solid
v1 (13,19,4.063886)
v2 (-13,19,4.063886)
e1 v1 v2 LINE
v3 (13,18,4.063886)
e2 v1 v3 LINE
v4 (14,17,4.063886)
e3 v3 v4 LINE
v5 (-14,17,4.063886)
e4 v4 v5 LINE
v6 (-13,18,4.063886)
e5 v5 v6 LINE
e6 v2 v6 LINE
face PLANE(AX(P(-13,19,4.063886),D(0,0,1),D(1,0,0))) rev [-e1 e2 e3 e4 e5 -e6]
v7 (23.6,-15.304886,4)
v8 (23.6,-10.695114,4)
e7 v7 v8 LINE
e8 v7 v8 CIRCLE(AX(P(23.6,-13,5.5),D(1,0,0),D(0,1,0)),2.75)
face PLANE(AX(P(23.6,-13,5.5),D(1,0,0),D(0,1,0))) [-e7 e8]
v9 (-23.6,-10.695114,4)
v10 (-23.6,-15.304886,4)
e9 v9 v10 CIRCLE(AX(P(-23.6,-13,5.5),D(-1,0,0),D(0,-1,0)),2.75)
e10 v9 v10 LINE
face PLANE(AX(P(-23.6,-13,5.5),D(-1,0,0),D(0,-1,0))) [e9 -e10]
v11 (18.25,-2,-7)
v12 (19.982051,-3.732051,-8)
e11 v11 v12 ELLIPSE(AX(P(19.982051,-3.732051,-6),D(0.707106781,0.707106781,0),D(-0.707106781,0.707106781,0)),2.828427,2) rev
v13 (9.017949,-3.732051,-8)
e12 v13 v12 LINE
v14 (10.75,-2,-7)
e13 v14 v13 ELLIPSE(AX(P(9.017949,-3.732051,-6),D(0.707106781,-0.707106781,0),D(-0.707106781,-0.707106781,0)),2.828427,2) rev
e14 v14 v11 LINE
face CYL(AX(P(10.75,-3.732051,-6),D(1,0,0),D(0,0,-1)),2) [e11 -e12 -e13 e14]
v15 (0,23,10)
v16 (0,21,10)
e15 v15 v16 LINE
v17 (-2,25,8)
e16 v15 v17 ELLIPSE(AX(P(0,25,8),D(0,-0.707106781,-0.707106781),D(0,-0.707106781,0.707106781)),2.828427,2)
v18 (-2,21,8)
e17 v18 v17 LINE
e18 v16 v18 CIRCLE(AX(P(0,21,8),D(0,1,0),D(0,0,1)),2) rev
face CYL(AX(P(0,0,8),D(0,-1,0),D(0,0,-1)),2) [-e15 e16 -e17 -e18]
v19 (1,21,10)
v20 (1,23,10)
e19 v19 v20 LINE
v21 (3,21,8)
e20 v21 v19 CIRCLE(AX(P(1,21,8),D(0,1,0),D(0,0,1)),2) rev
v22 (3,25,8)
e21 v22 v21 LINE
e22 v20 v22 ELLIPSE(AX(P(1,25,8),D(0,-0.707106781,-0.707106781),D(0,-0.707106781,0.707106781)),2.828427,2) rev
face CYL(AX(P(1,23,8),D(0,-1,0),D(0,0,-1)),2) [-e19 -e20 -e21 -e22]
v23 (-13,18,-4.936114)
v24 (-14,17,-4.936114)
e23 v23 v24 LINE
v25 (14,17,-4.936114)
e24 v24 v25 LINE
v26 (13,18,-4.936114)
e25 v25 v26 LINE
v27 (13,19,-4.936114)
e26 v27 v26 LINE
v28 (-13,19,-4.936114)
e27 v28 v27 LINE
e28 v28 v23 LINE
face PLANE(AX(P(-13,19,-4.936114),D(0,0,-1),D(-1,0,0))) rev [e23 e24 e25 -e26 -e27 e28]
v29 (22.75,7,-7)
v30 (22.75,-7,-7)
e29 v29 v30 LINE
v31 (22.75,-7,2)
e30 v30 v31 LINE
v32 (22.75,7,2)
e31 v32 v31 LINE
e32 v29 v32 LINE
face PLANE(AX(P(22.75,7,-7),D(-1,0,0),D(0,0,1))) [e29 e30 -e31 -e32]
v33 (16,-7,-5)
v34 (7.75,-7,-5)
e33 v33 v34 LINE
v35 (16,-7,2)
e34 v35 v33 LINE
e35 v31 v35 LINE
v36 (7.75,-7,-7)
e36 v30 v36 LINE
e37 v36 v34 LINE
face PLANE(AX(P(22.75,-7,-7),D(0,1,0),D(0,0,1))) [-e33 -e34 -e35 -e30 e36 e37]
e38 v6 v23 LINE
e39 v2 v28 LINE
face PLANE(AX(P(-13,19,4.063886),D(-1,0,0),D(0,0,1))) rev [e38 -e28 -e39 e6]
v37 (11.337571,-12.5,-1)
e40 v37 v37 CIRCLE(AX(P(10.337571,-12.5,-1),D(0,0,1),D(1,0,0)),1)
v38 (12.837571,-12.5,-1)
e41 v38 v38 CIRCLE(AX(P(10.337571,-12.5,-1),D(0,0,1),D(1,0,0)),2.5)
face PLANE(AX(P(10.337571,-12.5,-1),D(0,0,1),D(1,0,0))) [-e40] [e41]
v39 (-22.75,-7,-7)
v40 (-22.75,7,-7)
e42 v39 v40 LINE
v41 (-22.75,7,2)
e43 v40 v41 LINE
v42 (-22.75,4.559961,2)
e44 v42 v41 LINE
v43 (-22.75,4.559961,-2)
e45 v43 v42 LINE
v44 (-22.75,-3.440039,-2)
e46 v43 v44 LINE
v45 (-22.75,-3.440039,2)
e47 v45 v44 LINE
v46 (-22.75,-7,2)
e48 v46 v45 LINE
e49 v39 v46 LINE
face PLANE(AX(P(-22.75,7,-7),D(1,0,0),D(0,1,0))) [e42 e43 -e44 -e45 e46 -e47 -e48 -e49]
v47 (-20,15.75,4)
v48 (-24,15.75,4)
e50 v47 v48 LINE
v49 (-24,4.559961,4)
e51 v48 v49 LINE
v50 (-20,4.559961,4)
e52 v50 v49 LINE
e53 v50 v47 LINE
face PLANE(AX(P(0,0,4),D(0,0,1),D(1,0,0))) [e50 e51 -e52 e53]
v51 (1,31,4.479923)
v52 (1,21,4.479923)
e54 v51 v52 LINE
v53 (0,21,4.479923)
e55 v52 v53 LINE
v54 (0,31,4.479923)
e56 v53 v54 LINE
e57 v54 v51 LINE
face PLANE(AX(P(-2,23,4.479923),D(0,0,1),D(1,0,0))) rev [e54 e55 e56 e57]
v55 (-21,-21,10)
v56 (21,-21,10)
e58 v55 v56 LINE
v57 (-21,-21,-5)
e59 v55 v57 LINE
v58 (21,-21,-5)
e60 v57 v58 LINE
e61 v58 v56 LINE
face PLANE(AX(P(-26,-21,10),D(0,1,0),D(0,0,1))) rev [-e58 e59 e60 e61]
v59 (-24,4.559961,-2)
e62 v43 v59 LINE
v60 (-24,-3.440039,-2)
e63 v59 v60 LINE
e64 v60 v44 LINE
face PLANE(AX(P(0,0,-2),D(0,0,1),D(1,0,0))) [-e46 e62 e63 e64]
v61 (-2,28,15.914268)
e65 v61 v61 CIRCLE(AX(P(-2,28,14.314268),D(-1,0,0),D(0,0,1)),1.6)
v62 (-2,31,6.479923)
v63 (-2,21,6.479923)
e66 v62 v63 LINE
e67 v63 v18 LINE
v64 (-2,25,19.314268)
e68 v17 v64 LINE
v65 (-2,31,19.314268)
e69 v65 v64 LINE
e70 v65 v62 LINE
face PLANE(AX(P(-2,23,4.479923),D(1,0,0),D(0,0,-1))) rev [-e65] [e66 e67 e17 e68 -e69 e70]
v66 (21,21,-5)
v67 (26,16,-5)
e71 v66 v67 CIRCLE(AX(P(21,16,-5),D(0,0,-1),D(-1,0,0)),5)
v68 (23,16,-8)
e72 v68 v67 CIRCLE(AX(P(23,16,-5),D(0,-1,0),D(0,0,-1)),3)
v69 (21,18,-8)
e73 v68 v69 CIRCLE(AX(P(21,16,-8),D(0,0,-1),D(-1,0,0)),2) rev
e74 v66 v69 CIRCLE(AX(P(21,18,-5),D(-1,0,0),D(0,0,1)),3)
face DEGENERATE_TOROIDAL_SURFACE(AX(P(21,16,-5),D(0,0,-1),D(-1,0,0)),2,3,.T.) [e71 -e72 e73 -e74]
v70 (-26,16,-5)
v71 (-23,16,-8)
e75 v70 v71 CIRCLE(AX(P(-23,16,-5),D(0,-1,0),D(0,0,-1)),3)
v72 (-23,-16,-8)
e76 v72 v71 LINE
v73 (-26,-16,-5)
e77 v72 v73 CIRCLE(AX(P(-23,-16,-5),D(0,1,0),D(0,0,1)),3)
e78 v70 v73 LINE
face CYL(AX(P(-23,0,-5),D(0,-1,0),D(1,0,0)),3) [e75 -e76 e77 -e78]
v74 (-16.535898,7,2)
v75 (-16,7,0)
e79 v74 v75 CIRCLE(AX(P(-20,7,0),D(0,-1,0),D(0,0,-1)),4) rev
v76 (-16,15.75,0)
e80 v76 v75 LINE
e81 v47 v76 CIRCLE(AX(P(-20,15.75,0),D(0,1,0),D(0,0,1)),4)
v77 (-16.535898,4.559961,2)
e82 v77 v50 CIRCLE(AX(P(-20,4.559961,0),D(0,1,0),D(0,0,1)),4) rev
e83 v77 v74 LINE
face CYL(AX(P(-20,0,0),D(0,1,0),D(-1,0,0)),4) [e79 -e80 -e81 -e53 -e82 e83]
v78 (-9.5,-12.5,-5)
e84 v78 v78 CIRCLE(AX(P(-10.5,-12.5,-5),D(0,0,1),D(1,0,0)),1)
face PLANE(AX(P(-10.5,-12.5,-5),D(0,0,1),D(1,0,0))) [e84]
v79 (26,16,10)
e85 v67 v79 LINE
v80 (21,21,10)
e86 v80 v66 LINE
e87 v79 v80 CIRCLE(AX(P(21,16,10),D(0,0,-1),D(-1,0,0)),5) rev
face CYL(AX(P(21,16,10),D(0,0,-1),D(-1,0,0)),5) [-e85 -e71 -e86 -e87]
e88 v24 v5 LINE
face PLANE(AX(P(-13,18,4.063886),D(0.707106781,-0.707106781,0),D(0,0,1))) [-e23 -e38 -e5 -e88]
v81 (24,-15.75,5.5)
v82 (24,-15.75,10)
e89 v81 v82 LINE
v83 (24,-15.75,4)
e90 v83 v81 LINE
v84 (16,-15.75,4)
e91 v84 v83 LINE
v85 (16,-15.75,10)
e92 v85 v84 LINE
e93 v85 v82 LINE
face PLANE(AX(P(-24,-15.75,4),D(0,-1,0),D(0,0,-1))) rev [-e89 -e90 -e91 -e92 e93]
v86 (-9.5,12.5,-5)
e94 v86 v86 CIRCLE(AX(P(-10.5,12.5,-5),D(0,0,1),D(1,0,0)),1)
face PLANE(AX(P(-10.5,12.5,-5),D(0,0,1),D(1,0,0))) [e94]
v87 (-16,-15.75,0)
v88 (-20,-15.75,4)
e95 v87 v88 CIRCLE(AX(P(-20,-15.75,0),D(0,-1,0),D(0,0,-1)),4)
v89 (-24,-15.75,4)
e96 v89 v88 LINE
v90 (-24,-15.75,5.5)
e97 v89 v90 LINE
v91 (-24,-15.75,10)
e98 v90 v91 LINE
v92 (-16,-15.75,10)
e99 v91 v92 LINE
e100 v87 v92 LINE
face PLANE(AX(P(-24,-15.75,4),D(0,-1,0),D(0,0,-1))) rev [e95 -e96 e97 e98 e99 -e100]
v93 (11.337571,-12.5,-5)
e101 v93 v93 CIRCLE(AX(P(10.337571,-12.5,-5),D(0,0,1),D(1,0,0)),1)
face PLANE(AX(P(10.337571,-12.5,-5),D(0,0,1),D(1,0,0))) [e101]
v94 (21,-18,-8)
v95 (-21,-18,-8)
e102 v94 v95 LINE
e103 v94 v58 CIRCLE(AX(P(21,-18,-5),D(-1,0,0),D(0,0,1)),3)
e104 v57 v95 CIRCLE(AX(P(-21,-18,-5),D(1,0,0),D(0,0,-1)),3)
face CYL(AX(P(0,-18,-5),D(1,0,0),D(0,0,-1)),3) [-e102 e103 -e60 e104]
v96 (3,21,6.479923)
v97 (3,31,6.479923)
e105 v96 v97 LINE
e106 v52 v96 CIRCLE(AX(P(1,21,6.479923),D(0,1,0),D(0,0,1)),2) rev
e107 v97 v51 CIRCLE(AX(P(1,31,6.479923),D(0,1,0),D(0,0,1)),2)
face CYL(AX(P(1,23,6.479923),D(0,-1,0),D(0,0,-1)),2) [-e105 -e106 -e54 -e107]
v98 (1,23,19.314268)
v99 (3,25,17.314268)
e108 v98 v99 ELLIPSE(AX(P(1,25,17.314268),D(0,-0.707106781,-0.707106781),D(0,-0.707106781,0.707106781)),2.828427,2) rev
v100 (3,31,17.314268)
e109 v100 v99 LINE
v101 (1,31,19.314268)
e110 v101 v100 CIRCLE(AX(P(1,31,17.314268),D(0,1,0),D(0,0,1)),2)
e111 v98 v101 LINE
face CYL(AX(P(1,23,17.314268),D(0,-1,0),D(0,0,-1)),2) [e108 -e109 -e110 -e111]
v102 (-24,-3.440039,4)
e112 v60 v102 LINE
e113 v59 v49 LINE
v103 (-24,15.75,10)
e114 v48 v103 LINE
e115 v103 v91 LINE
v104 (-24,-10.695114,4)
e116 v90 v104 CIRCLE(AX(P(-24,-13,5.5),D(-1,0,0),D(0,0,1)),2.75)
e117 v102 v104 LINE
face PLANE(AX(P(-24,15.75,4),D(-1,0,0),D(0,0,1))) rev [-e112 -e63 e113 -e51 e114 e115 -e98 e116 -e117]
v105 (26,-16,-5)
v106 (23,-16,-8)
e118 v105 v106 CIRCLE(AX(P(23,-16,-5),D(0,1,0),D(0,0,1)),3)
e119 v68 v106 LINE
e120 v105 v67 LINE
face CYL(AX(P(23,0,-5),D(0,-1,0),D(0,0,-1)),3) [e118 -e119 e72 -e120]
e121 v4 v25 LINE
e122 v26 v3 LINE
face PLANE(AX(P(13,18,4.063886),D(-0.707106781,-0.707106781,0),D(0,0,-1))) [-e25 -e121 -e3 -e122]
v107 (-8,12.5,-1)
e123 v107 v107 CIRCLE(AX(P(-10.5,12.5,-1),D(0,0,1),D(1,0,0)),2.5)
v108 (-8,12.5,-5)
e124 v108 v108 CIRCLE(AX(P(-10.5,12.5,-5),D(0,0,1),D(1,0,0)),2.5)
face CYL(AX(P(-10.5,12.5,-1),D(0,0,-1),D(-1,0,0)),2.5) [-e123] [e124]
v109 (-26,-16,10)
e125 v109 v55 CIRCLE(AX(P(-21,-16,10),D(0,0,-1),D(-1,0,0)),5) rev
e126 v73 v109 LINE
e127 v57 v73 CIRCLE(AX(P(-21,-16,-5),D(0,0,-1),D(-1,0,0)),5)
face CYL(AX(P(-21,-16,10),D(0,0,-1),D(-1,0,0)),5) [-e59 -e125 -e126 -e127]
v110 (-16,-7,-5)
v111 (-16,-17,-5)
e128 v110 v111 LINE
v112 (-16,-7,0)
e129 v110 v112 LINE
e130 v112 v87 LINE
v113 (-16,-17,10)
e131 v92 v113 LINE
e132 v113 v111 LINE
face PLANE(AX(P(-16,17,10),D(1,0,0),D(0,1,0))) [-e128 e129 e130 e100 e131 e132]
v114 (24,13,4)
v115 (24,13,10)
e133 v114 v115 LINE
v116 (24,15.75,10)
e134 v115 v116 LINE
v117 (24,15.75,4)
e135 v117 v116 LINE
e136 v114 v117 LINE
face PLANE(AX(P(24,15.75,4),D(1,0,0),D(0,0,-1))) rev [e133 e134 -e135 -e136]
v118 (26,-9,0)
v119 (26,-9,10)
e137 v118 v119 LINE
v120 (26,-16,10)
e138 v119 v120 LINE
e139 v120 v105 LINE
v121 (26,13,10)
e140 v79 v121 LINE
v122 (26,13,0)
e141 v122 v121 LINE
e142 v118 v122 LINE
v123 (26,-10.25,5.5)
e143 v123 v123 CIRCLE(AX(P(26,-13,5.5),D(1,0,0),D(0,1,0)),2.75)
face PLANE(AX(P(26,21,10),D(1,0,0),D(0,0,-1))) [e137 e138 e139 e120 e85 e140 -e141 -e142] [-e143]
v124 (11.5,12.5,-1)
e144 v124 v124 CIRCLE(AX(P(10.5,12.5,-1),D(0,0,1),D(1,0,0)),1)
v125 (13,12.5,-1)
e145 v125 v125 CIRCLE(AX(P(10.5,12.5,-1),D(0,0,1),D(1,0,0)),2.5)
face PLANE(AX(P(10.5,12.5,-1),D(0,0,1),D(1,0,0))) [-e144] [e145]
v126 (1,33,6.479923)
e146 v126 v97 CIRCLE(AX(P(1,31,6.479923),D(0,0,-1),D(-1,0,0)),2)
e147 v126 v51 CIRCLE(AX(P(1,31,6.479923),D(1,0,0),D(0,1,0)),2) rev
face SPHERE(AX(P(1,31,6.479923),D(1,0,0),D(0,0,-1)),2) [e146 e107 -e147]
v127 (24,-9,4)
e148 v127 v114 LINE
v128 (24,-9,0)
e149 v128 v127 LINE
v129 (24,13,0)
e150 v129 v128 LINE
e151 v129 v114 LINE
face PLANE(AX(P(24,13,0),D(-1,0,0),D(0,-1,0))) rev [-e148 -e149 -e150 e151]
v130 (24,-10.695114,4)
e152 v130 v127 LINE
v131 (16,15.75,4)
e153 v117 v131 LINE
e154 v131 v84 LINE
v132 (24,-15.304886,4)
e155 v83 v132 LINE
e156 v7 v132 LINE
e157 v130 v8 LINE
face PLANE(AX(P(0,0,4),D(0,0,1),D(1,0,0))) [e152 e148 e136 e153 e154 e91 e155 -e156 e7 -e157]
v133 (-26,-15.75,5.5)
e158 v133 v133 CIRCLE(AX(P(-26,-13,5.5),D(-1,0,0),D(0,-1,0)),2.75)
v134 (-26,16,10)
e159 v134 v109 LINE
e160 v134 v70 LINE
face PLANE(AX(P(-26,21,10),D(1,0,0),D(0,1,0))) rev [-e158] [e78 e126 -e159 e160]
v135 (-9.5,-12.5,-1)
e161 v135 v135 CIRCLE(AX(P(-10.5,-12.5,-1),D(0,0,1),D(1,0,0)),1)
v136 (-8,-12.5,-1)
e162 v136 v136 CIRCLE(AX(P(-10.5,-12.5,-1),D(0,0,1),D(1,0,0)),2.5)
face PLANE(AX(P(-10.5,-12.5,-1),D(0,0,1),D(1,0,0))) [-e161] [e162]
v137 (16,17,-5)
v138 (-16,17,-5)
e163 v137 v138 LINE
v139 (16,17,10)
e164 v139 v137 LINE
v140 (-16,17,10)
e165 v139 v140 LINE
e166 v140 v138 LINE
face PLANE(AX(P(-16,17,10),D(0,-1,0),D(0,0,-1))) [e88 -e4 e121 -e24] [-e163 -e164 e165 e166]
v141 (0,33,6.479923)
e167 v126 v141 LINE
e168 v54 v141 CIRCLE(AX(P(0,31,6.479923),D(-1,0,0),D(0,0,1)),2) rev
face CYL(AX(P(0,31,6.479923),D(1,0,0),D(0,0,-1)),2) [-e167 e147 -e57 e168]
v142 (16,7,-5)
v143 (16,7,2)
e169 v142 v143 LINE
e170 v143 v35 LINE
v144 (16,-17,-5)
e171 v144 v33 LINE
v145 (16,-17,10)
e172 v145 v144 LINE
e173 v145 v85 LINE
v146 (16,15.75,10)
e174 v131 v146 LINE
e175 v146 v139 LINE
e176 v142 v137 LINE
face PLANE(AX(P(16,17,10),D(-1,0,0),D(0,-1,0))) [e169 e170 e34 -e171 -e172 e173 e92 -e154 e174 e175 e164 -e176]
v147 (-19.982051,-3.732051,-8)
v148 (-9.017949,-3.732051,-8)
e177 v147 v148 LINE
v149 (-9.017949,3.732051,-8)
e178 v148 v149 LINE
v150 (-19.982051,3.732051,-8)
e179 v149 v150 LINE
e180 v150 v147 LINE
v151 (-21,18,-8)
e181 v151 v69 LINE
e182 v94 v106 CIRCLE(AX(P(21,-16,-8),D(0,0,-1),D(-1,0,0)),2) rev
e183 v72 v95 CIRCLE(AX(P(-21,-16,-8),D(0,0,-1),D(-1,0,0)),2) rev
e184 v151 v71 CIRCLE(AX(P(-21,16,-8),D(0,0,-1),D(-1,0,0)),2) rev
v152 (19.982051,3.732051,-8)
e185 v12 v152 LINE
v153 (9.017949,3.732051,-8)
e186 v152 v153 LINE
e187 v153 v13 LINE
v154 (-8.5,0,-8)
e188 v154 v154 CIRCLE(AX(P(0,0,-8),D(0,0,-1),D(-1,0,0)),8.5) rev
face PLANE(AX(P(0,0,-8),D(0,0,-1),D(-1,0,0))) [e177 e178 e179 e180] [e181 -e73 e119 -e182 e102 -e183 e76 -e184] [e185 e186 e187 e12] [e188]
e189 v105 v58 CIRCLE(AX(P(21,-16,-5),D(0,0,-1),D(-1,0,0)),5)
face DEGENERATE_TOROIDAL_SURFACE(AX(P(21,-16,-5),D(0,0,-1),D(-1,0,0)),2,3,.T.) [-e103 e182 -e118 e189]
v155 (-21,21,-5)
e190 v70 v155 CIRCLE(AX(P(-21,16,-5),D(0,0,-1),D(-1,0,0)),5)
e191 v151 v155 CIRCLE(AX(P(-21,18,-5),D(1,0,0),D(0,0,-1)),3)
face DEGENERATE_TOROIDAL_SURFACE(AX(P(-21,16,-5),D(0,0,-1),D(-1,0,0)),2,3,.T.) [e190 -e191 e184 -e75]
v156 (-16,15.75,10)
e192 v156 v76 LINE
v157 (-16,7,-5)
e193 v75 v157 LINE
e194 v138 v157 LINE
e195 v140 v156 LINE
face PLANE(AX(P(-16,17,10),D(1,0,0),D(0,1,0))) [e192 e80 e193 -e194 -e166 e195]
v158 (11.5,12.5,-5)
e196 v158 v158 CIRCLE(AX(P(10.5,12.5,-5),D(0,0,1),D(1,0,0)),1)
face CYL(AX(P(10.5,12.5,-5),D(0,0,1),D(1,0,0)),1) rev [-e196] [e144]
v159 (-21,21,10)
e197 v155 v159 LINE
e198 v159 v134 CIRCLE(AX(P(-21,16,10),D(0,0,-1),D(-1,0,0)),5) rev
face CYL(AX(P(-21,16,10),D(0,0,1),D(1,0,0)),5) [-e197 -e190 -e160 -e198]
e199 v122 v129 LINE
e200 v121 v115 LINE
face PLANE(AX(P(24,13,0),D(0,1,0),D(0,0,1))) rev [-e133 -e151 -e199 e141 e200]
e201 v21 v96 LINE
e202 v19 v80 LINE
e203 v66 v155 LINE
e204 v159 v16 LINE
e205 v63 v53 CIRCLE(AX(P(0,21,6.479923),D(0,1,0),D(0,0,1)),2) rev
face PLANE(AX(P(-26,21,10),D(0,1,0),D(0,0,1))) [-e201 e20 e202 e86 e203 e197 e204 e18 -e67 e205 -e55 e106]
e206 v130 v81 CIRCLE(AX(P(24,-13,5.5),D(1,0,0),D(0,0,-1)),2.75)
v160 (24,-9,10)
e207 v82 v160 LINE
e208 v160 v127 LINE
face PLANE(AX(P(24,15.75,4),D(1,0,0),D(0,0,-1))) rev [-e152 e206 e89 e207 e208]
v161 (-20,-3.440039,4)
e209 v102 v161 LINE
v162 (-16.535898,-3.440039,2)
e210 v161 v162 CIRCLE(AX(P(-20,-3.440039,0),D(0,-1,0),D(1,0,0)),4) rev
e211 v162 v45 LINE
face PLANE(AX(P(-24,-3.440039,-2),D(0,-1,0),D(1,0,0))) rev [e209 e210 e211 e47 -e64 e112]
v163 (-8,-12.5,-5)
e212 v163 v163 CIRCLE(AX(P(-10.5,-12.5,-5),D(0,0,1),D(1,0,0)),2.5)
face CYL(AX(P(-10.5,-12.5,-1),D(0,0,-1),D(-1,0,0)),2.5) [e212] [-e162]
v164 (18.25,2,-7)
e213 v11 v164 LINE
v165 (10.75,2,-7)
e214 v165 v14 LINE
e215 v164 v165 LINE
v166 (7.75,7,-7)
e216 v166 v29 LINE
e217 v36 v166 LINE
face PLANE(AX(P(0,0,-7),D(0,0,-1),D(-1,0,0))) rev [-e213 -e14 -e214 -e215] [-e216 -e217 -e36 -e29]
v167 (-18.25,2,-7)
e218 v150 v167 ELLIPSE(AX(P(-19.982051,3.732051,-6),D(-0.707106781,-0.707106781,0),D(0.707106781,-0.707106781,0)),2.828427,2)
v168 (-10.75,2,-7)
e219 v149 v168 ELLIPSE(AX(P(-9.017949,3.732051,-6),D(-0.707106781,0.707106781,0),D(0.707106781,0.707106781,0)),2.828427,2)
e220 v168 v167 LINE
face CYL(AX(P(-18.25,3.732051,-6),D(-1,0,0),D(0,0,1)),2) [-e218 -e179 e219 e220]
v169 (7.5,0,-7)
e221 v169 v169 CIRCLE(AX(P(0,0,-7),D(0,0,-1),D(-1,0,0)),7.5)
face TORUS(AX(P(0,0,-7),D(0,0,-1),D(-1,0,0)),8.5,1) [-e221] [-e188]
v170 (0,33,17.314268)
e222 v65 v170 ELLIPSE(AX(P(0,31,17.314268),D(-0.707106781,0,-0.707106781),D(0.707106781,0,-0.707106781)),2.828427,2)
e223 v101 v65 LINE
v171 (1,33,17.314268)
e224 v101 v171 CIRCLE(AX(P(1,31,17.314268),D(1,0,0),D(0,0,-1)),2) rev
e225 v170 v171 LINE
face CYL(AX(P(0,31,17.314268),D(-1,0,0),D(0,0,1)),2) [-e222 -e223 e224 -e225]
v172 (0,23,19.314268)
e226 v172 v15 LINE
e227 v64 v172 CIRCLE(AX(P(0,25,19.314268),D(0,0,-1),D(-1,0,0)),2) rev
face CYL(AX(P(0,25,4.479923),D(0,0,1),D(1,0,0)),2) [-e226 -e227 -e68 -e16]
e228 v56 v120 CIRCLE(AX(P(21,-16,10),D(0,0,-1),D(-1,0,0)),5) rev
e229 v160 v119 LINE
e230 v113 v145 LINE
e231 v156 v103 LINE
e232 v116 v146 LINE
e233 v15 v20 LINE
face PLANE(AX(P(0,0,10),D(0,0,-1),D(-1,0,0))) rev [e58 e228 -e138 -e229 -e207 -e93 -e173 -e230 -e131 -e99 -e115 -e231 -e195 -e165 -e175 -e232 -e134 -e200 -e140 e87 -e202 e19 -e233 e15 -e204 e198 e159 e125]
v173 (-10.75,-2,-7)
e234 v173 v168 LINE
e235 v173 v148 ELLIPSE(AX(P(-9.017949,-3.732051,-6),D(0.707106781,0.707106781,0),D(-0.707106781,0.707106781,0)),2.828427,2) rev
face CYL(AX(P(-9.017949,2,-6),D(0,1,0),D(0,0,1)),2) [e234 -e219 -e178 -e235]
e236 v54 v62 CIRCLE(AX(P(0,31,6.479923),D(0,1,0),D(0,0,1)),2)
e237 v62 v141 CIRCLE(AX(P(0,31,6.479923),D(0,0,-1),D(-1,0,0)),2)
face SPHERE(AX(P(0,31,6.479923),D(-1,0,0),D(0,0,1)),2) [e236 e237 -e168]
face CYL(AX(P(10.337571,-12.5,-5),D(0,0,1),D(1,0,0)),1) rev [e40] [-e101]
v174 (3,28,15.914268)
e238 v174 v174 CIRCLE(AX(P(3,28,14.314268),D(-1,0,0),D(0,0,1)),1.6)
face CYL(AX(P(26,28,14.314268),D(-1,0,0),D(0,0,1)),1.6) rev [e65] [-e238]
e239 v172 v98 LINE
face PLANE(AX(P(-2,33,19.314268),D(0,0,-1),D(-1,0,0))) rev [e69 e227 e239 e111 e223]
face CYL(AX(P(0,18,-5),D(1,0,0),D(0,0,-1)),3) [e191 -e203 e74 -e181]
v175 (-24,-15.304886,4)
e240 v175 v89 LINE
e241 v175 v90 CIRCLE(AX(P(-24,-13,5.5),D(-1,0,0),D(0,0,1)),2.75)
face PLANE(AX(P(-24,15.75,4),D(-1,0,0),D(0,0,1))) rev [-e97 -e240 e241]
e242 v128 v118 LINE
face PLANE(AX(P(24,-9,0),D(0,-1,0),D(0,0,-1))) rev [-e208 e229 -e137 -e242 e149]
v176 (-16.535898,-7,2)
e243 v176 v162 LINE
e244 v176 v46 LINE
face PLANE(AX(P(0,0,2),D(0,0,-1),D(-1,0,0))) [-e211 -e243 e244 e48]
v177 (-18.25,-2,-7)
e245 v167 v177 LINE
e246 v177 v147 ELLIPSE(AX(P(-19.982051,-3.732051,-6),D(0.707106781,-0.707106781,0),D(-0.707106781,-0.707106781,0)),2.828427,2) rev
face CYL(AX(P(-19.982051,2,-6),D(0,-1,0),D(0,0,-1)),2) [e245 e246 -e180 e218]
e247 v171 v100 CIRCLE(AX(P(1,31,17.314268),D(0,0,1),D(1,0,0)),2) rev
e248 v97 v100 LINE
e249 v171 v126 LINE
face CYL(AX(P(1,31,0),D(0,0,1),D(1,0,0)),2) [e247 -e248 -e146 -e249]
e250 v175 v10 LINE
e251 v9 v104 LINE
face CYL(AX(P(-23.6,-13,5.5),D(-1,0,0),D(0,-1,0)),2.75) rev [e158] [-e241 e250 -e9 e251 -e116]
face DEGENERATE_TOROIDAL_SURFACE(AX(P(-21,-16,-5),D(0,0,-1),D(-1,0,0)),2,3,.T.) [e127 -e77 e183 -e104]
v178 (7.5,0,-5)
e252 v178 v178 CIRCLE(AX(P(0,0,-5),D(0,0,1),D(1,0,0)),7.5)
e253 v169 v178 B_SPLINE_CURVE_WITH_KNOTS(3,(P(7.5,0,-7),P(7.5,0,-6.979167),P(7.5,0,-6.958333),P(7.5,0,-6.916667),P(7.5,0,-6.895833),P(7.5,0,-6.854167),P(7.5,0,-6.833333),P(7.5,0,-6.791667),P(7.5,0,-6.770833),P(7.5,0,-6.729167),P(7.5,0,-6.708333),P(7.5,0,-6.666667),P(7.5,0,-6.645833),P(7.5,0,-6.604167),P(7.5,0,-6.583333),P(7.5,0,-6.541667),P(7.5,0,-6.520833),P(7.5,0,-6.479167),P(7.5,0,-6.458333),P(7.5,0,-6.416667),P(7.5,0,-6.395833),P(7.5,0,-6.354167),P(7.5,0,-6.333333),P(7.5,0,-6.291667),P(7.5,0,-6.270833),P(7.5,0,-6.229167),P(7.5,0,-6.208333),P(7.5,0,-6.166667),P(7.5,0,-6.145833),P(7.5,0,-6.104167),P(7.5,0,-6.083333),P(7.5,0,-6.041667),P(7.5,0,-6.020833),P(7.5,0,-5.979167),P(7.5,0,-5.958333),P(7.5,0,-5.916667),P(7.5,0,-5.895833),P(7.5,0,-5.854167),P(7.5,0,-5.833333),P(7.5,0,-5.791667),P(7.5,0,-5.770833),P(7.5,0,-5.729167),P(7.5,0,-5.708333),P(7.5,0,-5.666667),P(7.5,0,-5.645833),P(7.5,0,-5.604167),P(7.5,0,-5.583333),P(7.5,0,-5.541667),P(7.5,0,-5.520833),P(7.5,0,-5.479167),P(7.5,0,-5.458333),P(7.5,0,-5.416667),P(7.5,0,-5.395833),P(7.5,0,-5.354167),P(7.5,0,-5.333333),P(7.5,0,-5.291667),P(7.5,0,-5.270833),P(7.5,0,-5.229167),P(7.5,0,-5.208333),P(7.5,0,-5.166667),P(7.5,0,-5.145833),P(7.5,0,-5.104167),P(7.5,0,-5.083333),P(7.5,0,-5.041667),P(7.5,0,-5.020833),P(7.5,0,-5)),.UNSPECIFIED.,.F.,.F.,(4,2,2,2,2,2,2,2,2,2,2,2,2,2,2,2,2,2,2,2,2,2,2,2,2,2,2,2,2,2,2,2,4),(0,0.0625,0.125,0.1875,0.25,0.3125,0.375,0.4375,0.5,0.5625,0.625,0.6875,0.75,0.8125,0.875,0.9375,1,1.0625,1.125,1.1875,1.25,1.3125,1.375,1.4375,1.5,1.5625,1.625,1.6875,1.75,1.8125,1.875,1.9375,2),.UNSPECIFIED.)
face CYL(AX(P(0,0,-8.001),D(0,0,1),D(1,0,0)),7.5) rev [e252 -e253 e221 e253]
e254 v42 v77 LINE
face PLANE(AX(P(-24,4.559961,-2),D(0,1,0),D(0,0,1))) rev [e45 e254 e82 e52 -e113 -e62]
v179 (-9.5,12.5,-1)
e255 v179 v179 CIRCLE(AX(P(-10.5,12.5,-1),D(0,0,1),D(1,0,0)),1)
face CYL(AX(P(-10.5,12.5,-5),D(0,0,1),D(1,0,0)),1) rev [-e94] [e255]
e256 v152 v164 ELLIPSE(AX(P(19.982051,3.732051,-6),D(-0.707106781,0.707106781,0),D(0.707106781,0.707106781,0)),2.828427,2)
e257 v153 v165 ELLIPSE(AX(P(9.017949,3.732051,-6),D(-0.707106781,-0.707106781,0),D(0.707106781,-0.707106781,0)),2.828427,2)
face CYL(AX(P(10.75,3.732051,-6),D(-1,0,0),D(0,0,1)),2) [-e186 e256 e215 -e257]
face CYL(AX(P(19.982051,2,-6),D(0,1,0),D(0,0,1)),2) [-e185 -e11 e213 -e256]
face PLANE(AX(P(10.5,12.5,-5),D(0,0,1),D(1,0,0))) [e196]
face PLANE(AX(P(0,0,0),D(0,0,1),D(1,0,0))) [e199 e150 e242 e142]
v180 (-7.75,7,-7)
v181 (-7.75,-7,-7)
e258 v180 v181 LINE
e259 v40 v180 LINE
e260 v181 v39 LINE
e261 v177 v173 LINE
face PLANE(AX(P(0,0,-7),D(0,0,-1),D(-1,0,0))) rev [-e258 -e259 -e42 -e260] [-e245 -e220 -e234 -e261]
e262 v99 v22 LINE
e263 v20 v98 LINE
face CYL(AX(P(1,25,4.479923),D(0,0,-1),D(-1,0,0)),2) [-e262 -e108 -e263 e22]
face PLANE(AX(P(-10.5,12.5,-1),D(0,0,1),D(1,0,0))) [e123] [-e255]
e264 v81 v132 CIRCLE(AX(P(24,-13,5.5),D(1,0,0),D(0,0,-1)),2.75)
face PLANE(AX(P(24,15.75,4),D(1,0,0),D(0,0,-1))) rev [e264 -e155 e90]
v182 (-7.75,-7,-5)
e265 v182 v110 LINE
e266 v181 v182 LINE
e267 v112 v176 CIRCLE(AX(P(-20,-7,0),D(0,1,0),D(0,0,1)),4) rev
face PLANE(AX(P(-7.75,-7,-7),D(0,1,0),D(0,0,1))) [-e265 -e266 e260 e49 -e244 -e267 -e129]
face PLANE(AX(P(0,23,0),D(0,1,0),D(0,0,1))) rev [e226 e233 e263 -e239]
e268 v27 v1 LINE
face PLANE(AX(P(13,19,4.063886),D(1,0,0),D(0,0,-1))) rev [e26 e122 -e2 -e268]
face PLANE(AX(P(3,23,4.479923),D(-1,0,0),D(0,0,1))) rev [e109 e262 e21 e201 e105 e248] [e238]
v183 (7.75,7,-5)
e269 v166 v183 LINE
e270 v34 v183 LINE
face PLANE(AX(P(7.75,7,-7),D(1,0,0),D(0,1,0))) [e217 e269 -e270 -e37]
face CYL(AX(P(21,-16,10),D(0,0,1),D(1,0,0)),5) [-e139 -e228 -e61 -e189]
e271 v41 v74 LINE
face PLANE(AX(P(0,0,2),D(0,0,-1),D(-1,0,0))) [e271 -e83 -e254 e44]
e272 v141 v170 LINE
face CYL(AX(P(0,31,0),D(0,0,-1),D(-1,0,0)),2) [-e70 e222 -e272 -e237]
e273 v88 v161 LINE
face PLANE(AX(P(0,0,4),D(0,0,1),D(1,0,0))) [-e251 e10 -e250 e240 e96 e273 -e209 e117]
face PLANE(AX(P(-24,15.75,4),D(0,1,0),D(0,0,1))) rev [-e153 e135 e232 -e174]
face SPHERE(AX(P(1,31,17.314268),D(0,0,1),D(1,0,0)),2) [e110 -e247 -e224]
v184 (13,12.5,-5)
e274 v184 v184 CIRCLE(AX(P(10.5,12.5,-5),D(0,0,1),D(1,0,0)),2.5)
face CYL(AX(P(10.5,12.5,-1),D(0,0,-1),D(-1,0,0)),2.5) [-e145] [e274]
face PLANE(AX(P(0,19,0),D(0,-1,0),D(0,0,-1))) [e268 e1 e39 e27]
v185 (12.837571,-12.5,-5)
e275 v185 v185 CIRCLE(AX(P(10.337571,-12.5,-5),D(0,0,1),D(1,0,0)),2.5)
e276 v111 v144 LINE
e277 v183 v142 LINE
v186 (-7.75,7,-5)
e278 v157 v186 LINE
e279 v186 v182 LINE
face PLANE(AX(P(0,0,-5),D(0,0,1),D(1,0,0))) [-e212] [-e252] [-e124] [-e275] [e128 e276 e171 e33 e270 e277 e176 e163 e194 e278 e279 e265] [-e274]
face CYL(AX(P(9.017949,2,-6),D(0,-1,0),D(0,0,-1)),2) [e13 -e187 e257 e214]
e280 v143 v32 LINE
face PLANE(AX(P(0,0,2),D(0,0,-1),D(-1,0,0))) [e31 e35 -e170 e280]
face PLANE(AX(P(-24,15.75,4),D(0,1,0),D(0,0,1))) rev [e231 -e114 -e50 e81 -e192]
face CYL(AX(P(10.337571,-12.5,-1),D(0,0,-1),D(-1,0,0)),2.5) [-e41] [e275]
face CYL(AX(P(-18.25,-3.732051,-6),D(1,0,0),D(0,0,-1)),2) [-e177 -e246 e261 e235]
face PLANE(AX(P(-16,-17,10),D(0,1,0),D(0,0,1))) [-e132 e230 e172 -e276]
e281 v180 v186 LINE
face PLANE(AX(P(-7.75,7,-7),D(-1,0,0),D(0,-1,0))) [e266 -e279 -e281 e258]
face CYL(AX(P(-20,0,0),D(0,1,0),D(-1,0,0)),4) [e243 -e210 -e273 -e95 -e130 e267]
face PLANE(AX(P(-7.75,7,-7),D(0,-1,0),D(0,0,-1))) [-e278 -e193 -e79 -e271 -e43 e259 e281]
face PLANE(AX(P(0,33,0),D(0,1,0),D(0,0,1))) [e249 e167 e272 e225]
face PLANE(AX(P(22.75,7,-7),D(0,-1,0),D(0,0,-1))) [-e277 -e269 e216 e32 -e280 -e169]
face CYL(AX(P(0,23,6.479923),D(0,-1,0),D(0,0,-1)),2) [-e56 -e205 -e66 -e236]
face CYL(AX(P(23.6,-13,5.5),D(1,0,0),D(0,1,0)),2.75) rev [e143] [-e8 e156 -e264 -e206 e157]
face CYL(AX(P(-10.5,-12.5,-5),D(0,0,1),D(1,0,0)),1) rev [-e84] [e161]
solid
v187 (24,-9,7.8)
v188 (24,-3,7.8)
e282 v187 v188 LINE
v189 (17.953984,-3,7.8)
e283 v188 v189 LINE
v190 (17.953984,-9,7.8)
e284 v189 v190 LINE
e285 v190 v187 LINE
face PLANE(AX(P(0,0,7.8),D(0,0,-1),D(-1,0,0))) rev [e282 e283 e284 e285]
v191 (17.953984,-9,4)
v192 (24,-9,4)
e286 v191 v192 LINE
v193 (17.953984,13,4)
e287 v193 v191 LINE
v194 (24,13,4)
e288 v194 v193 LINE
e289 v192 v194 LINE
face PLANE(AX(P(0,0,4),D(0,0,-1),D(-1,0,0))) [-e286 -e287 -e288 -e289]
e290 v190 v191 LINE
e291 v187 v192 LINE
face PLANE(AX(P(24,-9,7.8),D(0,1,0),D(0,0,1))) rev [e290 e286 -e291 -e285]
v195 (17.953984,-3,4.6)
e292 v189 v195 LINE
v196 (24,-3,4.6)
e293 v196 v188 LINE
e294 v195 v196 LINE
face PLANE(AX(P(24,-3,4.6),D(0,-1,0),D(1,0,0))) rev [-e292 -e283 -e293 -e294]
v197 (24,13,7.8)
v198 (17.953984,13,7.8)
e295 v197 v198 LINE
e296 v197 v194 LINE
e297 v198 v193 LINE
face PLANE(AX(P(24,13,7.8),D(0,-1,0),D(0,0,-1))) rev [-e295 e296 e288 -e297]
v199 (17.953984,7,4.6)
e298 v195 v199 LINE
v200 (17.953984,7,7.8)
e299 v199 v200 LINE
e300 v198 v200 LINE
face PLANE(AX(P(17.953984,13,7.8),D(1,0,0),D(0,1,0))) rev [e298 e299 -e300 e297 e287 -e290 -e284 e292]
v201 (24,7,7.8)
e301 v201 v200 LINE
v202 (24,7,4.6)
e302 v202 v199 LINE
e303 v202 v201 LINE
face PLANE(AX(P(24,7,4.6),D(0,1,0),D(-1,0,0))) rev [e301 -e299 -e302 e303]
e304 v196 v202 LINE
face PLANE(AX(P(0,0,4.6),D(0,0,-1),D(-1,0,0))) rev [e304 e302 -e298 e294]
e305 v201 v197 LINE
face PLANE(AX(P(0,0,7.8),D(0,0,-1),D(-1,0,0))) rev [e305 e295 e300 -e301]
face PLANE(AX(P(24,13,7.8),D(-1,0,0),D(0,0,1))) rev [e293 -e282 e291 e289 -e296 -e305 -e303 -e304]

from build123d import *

# Parameters (mm, degrees)
SKETCH1_W               = 52
SKETCH1_H               = 42
BOSS_EXTRUDE1_DEPTH     = 10
SKETCH2_W               = 48
SKETCH2_H               = 31.5
CUT_EXTRUDE1_DEPTH      = 6
SKETCH6_W               = 52
SKETCH6_H               = 42
BOSS_EXTRUDE2_DEPTH     = 8
CUT_EXTRUDE5_DEPTH      = 36.510561809
CUT_EXTRUDE5_DEPTH_BACK = 9
SKETCH5_W               = 32
SKETCH5_H               = 34
CUT_EXTRUDE4_REACH      = 38.633
SKETCH7_R               = 7.5
FILLET2_R               = 1
FILLET3_R               = 3
FILLET4_R               = 5
SKETCH8_W               = 2
SKETCH8_H               = 22
CUT_EXTRUDE6_DEPTH      = 10
SKETCH11_W              = 6.046016102
SKETCH11_H              = 22
BOSS_EXTRUDE9_DEPTH     = 3.8
SKETCH12_W              = 7.5
SKETCH12_H              = 10
CUT_EXTRUDE8_DEPTH      = 3.2
FILLET9_R               = 4
SKETCH13_R              = 2.75
CUT_EXTRUDE9_DEPTH      = 2.4
CUT_EXTRUDE10_START     = -2.4
SKETCH14_R              = 2.75
CUT_EXTRUDE10_DEPTH     = 2.4
SKETCH18_W              = 15
SKETCH18_H              = 14
CUT_EXTRUDE15_DEPTH     = 9
SKETCH19_W              = 7.5
SKETCH19_H              = 4
CUT_EXTRUDE16_DEPTH     = 1
SKETCH21_W              = 5
SKETCH21_H              = 5.520077182
BOSS_EXTRUDE10_DEPTH    = 2
SKETCH27_W              = 5
SKETCH27_H              = 14.834345629
BOSS_EXTRUDE13_DEPTH    = 10
SKETCH28_R              = 1.6
CUT_EXTRUDE19_DEPTH     = 48.392414643
FILLET14_R              = 2
FILLET13_R              = 2
SKETCH25_R              = 2.5
BOSS_EXTRUDE12_DEPTH    = 4
SKETCH26_R              = 1
CUT_EXTRUDE18_DEPTH     = 4
SKETCH29_W              = 8
SKETCH29_H              = 8
CUT_EXTRUDE20_DEPTH     = 6
SKETCH30_W              = 26
SKETCH30_H              = 9
CUT_EXTRUDE21_DEPTH     = 2
CHAMFER1_SIZE           = 1


with BuildPart() as part:
    # Sketch1 → Boss-Extrude1 (new body)
    with BuildSketch(Plane.XY):
        Rectangle(SKETCH1_W, SKETCH1_H)
    extrude(amount=BOSS_EXTRUDE1_DEPTH)

    # Sketch2 → Cut-Extrude1 (cut)
    with BuildSketch(Plane.XY.offset(10)):
        Rectangle(SKETCH2_W, SKETCH2_H)
    extrude(amount=-CUT_EXTRUDE1_DEPTH, mode=Mode.SUBTRACT)

    # Sketch6 → Boss-Extrude2 (add)
    with BuildSketch(Plane(origin=(0, 0, 0), x_dir=(-1, 0, 0), z_dir=(0, 0, -1))):
        Rectangle(SKETCH6_W, SKETCH6_H)
    extrude(amount=BOSS_EXTRUDE2_DEPTH)

    # Sketch5 → Cut-Extrude5 (cut, two sides: drawn at the far end of the back side and taken through both)
    with BuildSketch(Plane.XY.offset(4).offset(-CUT_EXTRUDE5_DEPTH_BACK)):
        Rectangle(SKETCH5_W, SKETCH5_H)
    extrude(amount=CUT_EXTRUDE5_DEPTH + CUT_EXTRUDE5_DEPTH_BACK, mode=Mode.SUBTRACT)

    # Sketch7 → Cut-Extrude4 (cut, up to next)
    with BuildSketch(Plane.XY.offset(-5), mode=Mode.PRIVATE) as cut_extrude4_sk1:
        Circle(SKETCH7_R)
    cut_extrude4_tool1 = extrude(cut_extrude4_sk1.sketch, amount=-CUT_EXTRUDE4_REACH, mode=Mode.PRIVATE) & part.part
    add(cut_extrude4_tool1.solids().sort_by_distance((0, 0, -5))[0], mode=Mode.SUBTRACT)

    # Fillet2
    fillet2_edges = [part.edges().sort_by_distance(p)[0] for p in [
        (-7.5, 0, -8),
    ]]
    fillet(fillet2_edges, radius=FILLET2_R)

    # Fillet3
    fillet3_edges = [part.edges().sort_by_distance(p)[0] for p in [
        (-26, 0, -8),
        (0, 21, -8),
        (26, 0, -8),
        (0, -21, -8),
    ]]
    fillet(fillet3_edges, radius=FILLET3_R)

    # Fillet4
    # the kernel refuses this fillet: 5 mm, written as the material it takes off along each edge
    with BuildSketch(Plane(origin=(21, 16, -8), x_dir=(0, 1, 0), z_dir=(-1, 0, 0))) as fillet4_piece_1:
        with BuildLine():
            CenterArc((2, -3), 3, 0, 90)
            Line((5, -3), (5, 0))
            Line((5, 0), (2, 0))
        make_face()
    revolve(axis=Axis((21, 16, -8), (0, 0, -1)), revolution_arc=90, mode=Mode.SUBTRACT)
    with BuildSketch(Plane(origin=(-21, 16, -8), x_dir=(-1, 0, 0), z_dir=(0, -1, 0))) as fillet4_piece_2:
        with BuildLine():
            CenterArc((2, -3), 3, 0, 90)
            Line((5, -3), (5, 0))
            Line((5, 0), (2, 0))
        make_face()
    revolve(axis=Axis((-21, 16, -8), (0, 0, -1)), revolution_arc=90, mode=Mode.SUBTRACT)
    with BuildSketch(Plane(origin=(21, -16, -8), x_dir=(1, 0, 0), z_dir=(0, 1, 0))) as fillet4_piece_3:
        with BuildLine():
            CenterArc((2, -3), 3, 0, 90)
            Line((5, -3), (5, 0))
            Line((5, 0), (2, 0))
        make_face()
    revolve(axis=Axis((21, -16, -8), (0, 0, -1)), revolution_arc=90, mode=Mode.SUBTRACT)
    with BuildSketch(Plane(origin=(-21, -16, -8), x_dir=(0, -1, 0), z_dir=(1, 0, 0))) as fillet4_piece_4:
        with BuildLine():
            CenterArc((2, -3), 3, 0, 90)
            Line((5, -3), (5, 0))
            Line((5, 0), (2, 0))
        make_face()
    revolve(axis=Axis((-21, -16, -8), (0, 0, -1)), revolution_arc=90, mode=Mode.SUBTRACT)
    with BuildSketch(Plane(origin=(-26, 21, -8), x_dir=(0, -1, 0), z_dir=(0, 0, 1)), Plane(origin=(26, -21, 22.5), x_dir=(-1, 0, 0), z_dir=(0, 0, -1))) as fillet4_piece_5:
        with BuildLine():
            CenterArc((FILLET4_R, FILLET4_R), FILLET4_R, 180, 90)
            Line((0, FILLET4_R), (0, 0))
            Line((0, 0), (FILLET4_R, 0))
        make_face()
    extrude(amount=30.5, mode=Mode.SUBTRACT)
    with BuildSketch(Plane(origin=(-26, -21, -8), x_dir=(0, 1, 0), z_dir=(0, 0, 1)), Plane(origin=(26, 21, 22.5), x_dir=(-1, 0, 0), z_dir=(0, 0, -1))) as fillet4_piece_6:
        with BuildLine():
            CenterArc((FILLET4_R, -FILLET4_R), FILLET4_R, 90, 90)
            Line((0, -FILLET4_R), (0, 0))
            Line((0, 0), (FILLET4_R, 0))
        make_face()
    extrude(amount=30.5, mode=Mode.SUBTRACT)

    # Sketch8 → Cut-Extrude6 (cut)
    with BuildSketch(Plane.XY.offset(10)):
        with Locations((25, 2)):
            Rectangle(SKETCH8_W, SKETCH8_H)
    extrude(amount=-CUT_EXTRUDE6_DEPTH, mode=Mode.SUBTRACT)

    # Fillet9
    fillet9_edges = [part.edges().sort_by_distance(p)[0] for p in [
        (-16, 0, 4),
    ]]
    fillet(fillet9_edges, radius=FILLET9_R)

    # Sketch13 → Cut-Extrude9 (cut)
    with BuildSketch(Plane(origin=(26, 0, 0), x_dir=(0, 0, -1), z_dir=(1, 0, 0))):
        with Locations(Location((-5.5, -13, 0), (0, 0, 90))):
            Circle(SKETCH13_R)
    extrude(amount=-CUT_EXTRUDE9_DEPTH, mode=Mode.SUBTRACT)

    # Sketch14 → Cut-Extrude10 (cut)
    with BuildSketch(Plane.ZY.offset(26).offset(CUT_EXTRUDE10_START)):
        with Locations(Location((5.5, -13, 0), (0, 0, 90))):
            Circle(SKETCH14_R)
    extrude(amount=CUT_EXTRUDE10_DEPTH, mode=Mode.SUBTRACT)

    # Sketch18 → Cut-Extrude15 (cut)
    with BuildSketch(Plane(origin=(0, 0, 2), x_dir=(-1, 0, 0), z_dir=(0, 0, -1))):
        with Locations((-15.25, 0)):
            Rectangle(SKETCH18_W, SKETCH18_H)
        with Locations((15.25, 0)):
            Rectangle(SKETCH18_W, SKETCH18_H)
    extrude(amount=CUT_EXTRUDE15_DEPTH, mode=Mode.SUBTRACT)

    # Sketch19 → Cut-Extrude16 (cut)
    with BuildSketch(Plane.XY.offset(-7)):
        with Locations((14.5, 0)):
            Rectangle(SKETCH19_W, SKETCH19_H)
        with Locations((-14.5, 0)):
            Rectangle(SKETCH19_W, SKETCH19_H)
    extrude(amount=-CUT_EXTRUDE16_DEPTH, mode=Mode.SUBTRACT)

    # Sketch21 → Boss-Extrude10 (add)
    with BuildSketch(Plane(origin=(0, 21, 0), x_dir=(1, 0, 0), z_dir=(0, 1, 0))):
        with Locations((0.5, -7.239961409)):
            Rectangle(SKETCH21_W, SKETCH21_H)
    extrude(amount=BOSS_EXTRUDE10_DEPTH)

    # Sketch27 → Boss-Extrude13 (add)
    with BuildSketch(Plane(origin=(0, 23, 0), x_dir=(1, 0, 0), z_dir=(0, 1, 0))):
        with Locations((0.5, -11.897095633)):
            Rectangle(SKETCH27_W, SKETCH27_H)
    extrude(amount=BOSS_EXTRUDE13_DEPTH)

    # Sketch28 → Cut-Extrude19 (cut, through all)
    with BuildSketch(Plane.ZY.offset(2)):
        with Locations((14.314268447, 28)):
            Circle(SKETCH28_R)
    extrude(amount=-CUT_EXTRUDE19_DEPTH, mode=Mode.SUBTRACT)

    # Fillet14
    fillet14_edges = [part.edges().sort_by_distance(p)[0] for p in [
        (-2, 27, 4.479922818),
        (-2, 22, 10),
        (3, 22, 10),
        (3, 27, 4.479922818),
        (-2, 23, 14.657134224),
        (3, 23, 14.657134224),
        (3, 28, 19.314268447),
        (-2, 33, 11.897095633),
        (0.5, 33, 19.314268447),
        (3, 33, 11.897095633),
        (0.5, 33, 4.479922818),
    ]]
    fillet(fillet14_edges, radius=FILLET14_R)

    # Fillet13
    # the kernel refuses this fillet: 2 mm, written as the material it takes off along each edge
    with BuildSketch(Plane(origin=(-18.25, -2, -8), x_dir=(-1, 0, 0), z_dir=(0, 1, 0)), Plane(origin=(-10.75, 2, -8), x_dir=(1, 0, 0), z_dir=(0, -1, 0)), Plane(origin=(10.75, -2, -8), x_dir=(-1, 0, 0), z_dir=(0, 1, 0)), Plane(origin=(18.25, 2, -8), x_dir=(1, 0, 0), z_dir=(0, -1, 0))) as fillet13_piece_1:
        with BuildLine():
            CenterArc((1.732050808, 2), FILLET13_R, 210, 60)
            Line((0, 1), (-0.034641016, 0.98))
            ThreePointArc((-0.034641016, 0.98), (-0.04, 0.5), (-0.04, 0))
            Line((-0.04, 0), (0, -0.04))
            Line((0, -0.04), (1.732050808, -0.04))
            Line((1.732050808, -0.04), (1.732050808, 0))
        make_face()
    extrude(amount=4, mode=Mode.SUBTRACT)
    with BuildSketch(Plane(origin=(-10.75, -2, -8), x_dir=(0, -1, 0), z_dir=(-1, 0, 0)), Plane(origin=(-18.25, 2, -8), x_dir=(0, 1, 0), z_dir=(1, 0, 0)), Plane(origin=(18.25, -2, -8), x_dir=(0, -1, 0), z_dir=(-1, 0, 0)), Plane(origin=(10.75, 2, -8), x_dir=(0, 1, 0), z_dir=(1, 0, 0))) as fillet13_piece_2:
        with BuildLine():
            CenterArc((1.732050808, 2), FILLET13_R, 210, 60)
            Line((0, 1), (-0.034641016, 0.98))
            ThreePointArc((-0.034641016, 0.98), (-0.04, 0.5), (-0.04, 0))
            Line((-0.04, 0), (0, -0.04))
            Line((0, -0.04), (1.732050808, -0.04))
            Line((1.732050808, -0.04), (1.732050808, 0))
        make_face()
    extrude(amount=7.5, mode=Mode.SUBTRACT)
    with BuildSketch(Plane(origin=(-18.25, -6.330127019, -8), x_dir=(-1, 0, 0), z_dir=(0, 1, 0))) as fillet13_piece_3a_section:
        with BuildLine():
            CenterArc((1.732050808, 2), FILLET13_R, 210, 60)
            Line((0, 1), (-0.034641016, 0.98))
            ThreePointArc((-0.034641016, 0.98), (-0.04, 0.5), (-0.04, 0))
            Line((-0.04, 0), (0, -0.04))
            Line((0, -0.04), (1.732050808, -0.04))
            Line((1.732050808, -0.04), (1.732050808, 0))
        make_face()
    fillet13_piece_3a = extrude(amount=8.330127019, mode=Mode.PRIVATE)
    fillet13_piece_3a = split(fillet13_piece_3a, bisect_by=Plane(origin=(-18.682620892, -2, -7.740966578), z_dir=(0, -1, 0)), keep=Keep.TOP, mode=Mode.PRIVATE)
    with BuildSketch(Plane(origin=(-10.75, -2, -8), x_dir=(0, -1, 0), z_dir=(-1, 0, 0))) as fillet13_piece_3b_section:
        with BuildLine():
            CenterArc((1.732050808, 2), FILLET13_R, 210, 60)
            Line((0, 1), (-0.034641016, 0.98))
            ThreePointArc((-0.034641016, 0.98), (-0.04, 0.5), (-0.04, 0))
            Line((-0.04, 0), (0, -0.04))
            Line((0, -0.04), (1.732050808, -0.04))
            Line((1.732050808, -0.04), (1.732050808, 0))
        make_face()
    fillet13_piece_3b = extrude(amount=11.830127019, mode=Mode.PRIVATE)
    fillet13_piece_3b = split(fillet13_piece_3b, bisect_by=Plane(origin=(-18.25, -2.432620892, -7.740966578), z_dir=(-1, 0, 0)), keep=Keep.TOP, mode=Mode.PRIVATE)
    fillet13_piece_3 = fillet13_piece_3a & fillet13_piece_3b
    add(fillet13_piece_3, mode=Mode.SUBTRACT)
    with BuildSketch(Plane(origin=(-18.25, -2, -8), x_dir=(-1, 0, 0), z_dir=(0, 1, 0))) as fillet13_piece_4a_section:
        with BuildLine():
            CenterArc((1.732050808, 2), FILLET13_R, 210, 60)
            Line((0, 1), (-0.034641016, 0.98))
            ThreePointArc((-0.034641016, 0.98), (-0.04, 0.5), (-0.04, 0))
            Line((-0.04, 0), (0, -0.04))
            Line((0, -0.04), (1.732050808, -0.04))
            Line((1.732050808, -0.04), (1.732050808, 0))
        make_face()
    fillet13_piece_4a = extrude(amount=8.330127019, mode=Mode.PRIVATE)
    fillet13_piece_4a = split(fillet13_piece_4a, bisect_by=Plane(origin=(-18.682620892, 2, -7.740966578), z_dir=(0, 1, 0)), keep=Keep.TOP, mode=Mode.PRIVATE)
    with BuildSketch(Plane(origin=(-22.580127019, 2, -8), x_dir=(0, 1, 0), z_dir=(1, 0, 0))) as fillet13_piece_4b_section:
        with BuildLine():
            CenterArc((1.732050808, 2), FILLET13_R, 210, 60)
            Line((0, 1), (-0.034641016, 0.98))
            ThreePointArc((-0.034641016, 0.98), (-0.04, 0.5), (-0.04, 0))
            Line((-0.04, 0), (0, -0.04))
            Line((0, -0.04), (1.732050808, -0.04))
            Line((1.732050808, -0.04), (1.732050808, 0))
        make_face()
    fillet13_piece_4b = extrude(amount=11.830127019, mode=Mode.PRIVATE)
    fillet13_piece_4b = split(fillet13_piece_4b, bisect_by=Plane(origin=(-18.25, 2.432620892, -7.740966578), z_dir=(-1, 0, 0)), keep=Keep.TOP, mode=Mode.PRIVATE)
    fillet13_piece_4 = fillet13_piece_4a & fillet13_piece_4b
    add(fillet13_piece_4, mode=Mode.SUBTRACT)
    with BuildSketch(Plane(origin=(-10.75, 6.330127019, -8), x_dir=(1, 0, 0), z_dir=(0, -1, 0))) as fillet13_piece_5a_section:
        with BuildLine():
            CenterArc((1.732050808, 2), FILLET13_R, 210, 60)
            Line((0, 1), (-0.034641016, 0.98))
            ThreePointArc((-0.034641016, 0.98), (-0.04, 0.5), (-0.04, 0))
            Line((-0.04, 0), (0, -0.04))
            Line((0, -0.04), (1.732050808, -0.04))
            Line((1.732050808, -0.04), (1.732050808, 0))
        make_face()
    fillet13_piece_5a = extrude(amount=8.330127019, mode=Mode.PRIVATE)
    fillet13_piece_5a = split(fillet13_piece_5a, bisect_by=Plane(origin=(-10.317379108, 2, -7.740966578), z_dir=(0, 1, 0)), keep=Keep.TOP, mode=Mode.PRIVATE)
    with BuildSketch(Plane(origin=(-18.25, 2, -8), x_dir=(0, 1, 0), z_dir=(1, 0, 0))) as fillet13_piece_5b_section:
        with BuildLine():
            CenterArc((1.732050808, 2), FILLET13_R, 210, 60)
            Line((0, 1), (-0.034641016, 0.98))
            ThreePointArc((-0.034641016, 0.98), (-0.04, 0.5), (-0.04, 0))
            Line((-0.04, 0), (0, -0.04))
            Line((0, -0.04), (1.732050808, -0.04))
            Line((1.732050808, -0.04), (1.732050808, 0))
        make_face()
    fillet13_piece_5b = extrude(amount=11.830127019, mode=Mode.PRIVATE)
    fillet13_piece_5b = split(fillet13_piece_5b, bisect_by=Plane(origin=(-10.75, 2.432620892, -7.740966578), z_dir=(1, 0, 0)), keep=Keep.TOP, mode=Mode.PRIVATE)
    fillet13_piece_5 = fillet13_piece_5a & fillet13_piece_5b
    add(fillet13_piece_5, mode=Mode.SUBTRACT)
    with BuildSketch(Plane(origin=(-6.419872981, -2, -8), x_dir=(0, -1, 0), z_dir=(-1, 0, 0))) as fillet13_piece_6a_section:
        with BuildLine():
            CenterArc((1.732050808, 2), FILLET13_R, 210, 60)
            Line((0, 1), (-0.034641016, 0.98))
            ThreePointArc((-0.034641016, 0.98), (-0.04, 0.5), (-0.04, 0))
            Line((-0.04, 0), (0, -0.04))
            Line((0, -0.04), (1.732050808, -0.04))
            Line((1.732050808, -0.04), (1.732050808, 0))
        make_face()
    fillet13_piece_6a = extrude(amount=11.830127019, mode=Mode.PRIVATE)
    fillet13_piece_6a = split(fillet13_piece_6a, bisect_by=Plane(origin=(-10.75, -2.432620892, -7.740966578), z_dir=(1, 0, 0)), keep=Keep.TOP, mode=Mode.PRIVATE)
    with BuildSketch(Plane(origin=(-10.75, 2, -8), x_dir=(1, 0, 0), z_dir=(0, -1, 0))) as fillet13_piece_6b_section:
        with BuildLine():
            CenterArc((1.732050808, 2), FILLET13_R, 210, 60)
            Line((0, 1), (-0.034641016, 0.98))
            ThreePointArc((-0.034641016, 0.98), (-0.04, 0.5), (-0.04, 0))
            Line((-0.04, 0), (0, -0.04))
            Line((0, -0.04), (1.732050808, -0.04))
            Line((1.732050808, -0.04), (1.732050808, 0))
        make_face()
    fillet13_piece_6b = extrude(amount=8.330127019, mode=Mode.PRIVATE)
    fillet13_piece_6b = split(fillet13_piece_6b, bisect_by=Plane(origin=(-10.317379108, -2, -7.740966578), z_dir=(0, -1, 0)), keep=Keep.TOP, mode=Mode.PRIVATE)
    fillet13_piece_6 = fillet13_piece_6a & fillet13_piece_6b
    add(fillet13_piece_6, mode=Mode.SUBTRACT)
    with BuildSketch(Plane(origin=(10.75, -6.330127019, -8), x_dir=(-1, 0, 0), z_dir=(0, 1, 0))) as fillet13_piece_7a_section:
        with BuildLine():
            CenterArc((1.732050808, 2), FILLET13_R, 210, 60)
            Line((0, 1), (-0.034641016, 0.98))
            ThreePointArc((-0.034641016, 0.98), (-0.04, 0.5), (-0.04, 0))
            Line((-0.04, 0), (0, -0.04))
            Line((0, -0.04), (1.732050808, -0.04))
            Line((1.732050808, -0.04), (1.732050808, 0))
        make_face()
    fillet13_piece_7a = extrude(amount=8.330127019, mode=Mode.PRIVATE)
    fillet13_piece_7a = split(fillet13_piece_7a, bisect_by=Plane(origin=(10.317379108, -2, -7.740966578), z_dir=(0, -1, 0)), keep=Keep.TOP, mode=Mode.PRIVATE)
    with BuildSketch(Plane(origin=(18.25, -2, -8), x_dir=(0, -1, 0), z_dir=(-1, 0, 0))) as fillet13_piece_7b_section:
        with BuildLine():
            CenterArc((1.732050808, 2), FILLET13_R, 210, 60)
            Line((0, 1), (-0.034641016, 0.98))
            ThreePointArc((-0.034641016, 0.98), (-0.04, 0.5), (-0.04, 0))
            Line((-0.04, 0), (0, -0.04))
            Line((0, -0.04), (1.732050808, -0.04))
            Line((1.732050808, -0.04), (1.732050808, 0))
        make_face()
    fillet13_piece_7b = extrude(amount=11.830127019, mode=Mode.PRIVATE)
    fillet13_piece_7b = split(fillet13_piece_7b, bisect_by=Plane(origin=(10.75, -2.432620892, -7.740966578), z_dir=(-1, 0, 0)), keep=Keep.TOP, mode=Mode.PRIVATE)
    fillet13_piece_7 = fillet13_piece_7a & fillet13_piece_7b
    add(fillet13_piece_7, mode=Mode.SUBTRACT)
    with BuildSketch(Plane(origin=(10.75, -2, -8), x_dir=(-1, 0, 0), z_dir=(0, 1, 0))) as fillet13_piece_8a_section:
        with BuildLine():
            CenterArc((1.732050808, 2), FILLET13_R, 210, 60)
            Line((0, 1), (-0.034641016, 0.98))
            ThreePointArc((-0.034641016, 0.98), (-0.04, 0.5), (-0.04, 0))
            Line((-0.04, 0), (0, -0.04))
            Line((0, -0.04), (1.732050808, -0.04))
            Line((1.732050808, -0.04), (1.732050808, 0))
        make_face()
    fillet13_piece_8a = extrude(amount=8.330127019, mode=Mode.PRIVATE)
    fillet13_piece_8a = split(fillet13_piece_8a, bisect_by=Plane(origin=(10.317379108, 2, -7.740966578), z_dir=(0, 1, 0)), keep=Keep.TOP, mode=Mode.PRIVATE)
    with BuildSketch(Plane(origin=(6.419872981, 2, -8), x_dir=(0, 1, 0), z_dir=(1, 0, 0))) as fillet13_piece_8b_section:
        with BuildLine():
            CenterArc((1.732050808, 2), FILLET13_R, 210, 60)
            Line((0, 1), (-0.034641016, 0.98))
            ThreePointArc((-0.034641016, 0.98), (-0.04, 0.5), (-0.04, 0))
            Line((-0.04, 0), (0, -0.04))
            Line((0, -0.04), (1.732050808, -0.04))
            Line((1.732050808, -0.04), (1.732050808, 0))
        make_face()
    fillet13_piece_8b = extrude(amount=11.830127019, mode=Mode.PRIVATE)
    fillet13_piece_8b = split(fillet13_piece_8b, bisect_by=Plane(origin=(10.75, 2.432620892, -7.740966578), z_dir=(-1, 0, 0)), keep=Keep.TOP, mode=Mode.PRIVATE)
    fillet13_piece_8 = fillet13_piece_8a & fillet13_piece_8b
    add(fillet13_piece_8, mode=Mode.SUBTRACT)
    with BuildSketch(Plane(origin=(18.25, 6.330127019, -8), x_dir=(1, 0, 0), z_dir=(0, -1, 0))) as fillet13_piece_9a_section:
        with BuildLine():
            CenterArc((1.732050808, 2), FILLET13_R, 210, 60)
            Line((0, 1), (-0.034641016, 0.98))
            ThreePointArc((-0.034641016, 0.98), (-0.04, 0.5), (-0.04, 0))
            Line((-0.04, 0), (0, -0.04))
            Line((0, -0.04), (1.732050808, -0.04))
            Line((1.732050808, -0.04), (1.732050808, 0))
        make_face()
    fillet13_piece_9a = extrude(amount=8.330127019, mode=Mode.PRIVATE)
    fillet13_piece_9a = split(fillet13_piece_9a, bisect_by=Plane(origin=(18.682620892, 2, -7.740966578), z_dir=(0, 1, 0)), keep=Keep.TOP, mode=Mode.PRIVATE)
    with BuildSketch(Plane(origin=(10.75, 2, -8), x_dir=(0, 1, 0), z_dir=(1, 0, 0))) as fillet13_piece_9b_section:
        with BuildLine():
            CenterArc((1.732050808, 2), FILLET13_R, 210, 60)
            Line((0, 1), (-0.034641016, 0.98))
            ThreePointArc((-0.034641016, 0.98), (-0.04, 0.5), (-0.04, 0))
            Line((-0.04, 0), (0, -0.04))
            Line((0, -0.04), (1.732050808, -0.04))
            Line((1.732050808, -0.04), (1.732050808, 0))
        make_face()
    fillet13_piece_9b = extrude(amount=11.830127019, mode=Mode.PRIVATE)
    fillet13_piece_9b = split(fillet13_piece_9b, bisect_by=Plane(origin=(18.25, 2.432620892, -7.740966578), z_dir=(1, 0, 0)), keep=Keep.TOP, mode=Mode.PRIVATE)
    fillet13_piece_9 = fillet13_piece_9a & fillet13_piece_9b
    add(fillet13_piece_9, mode=Mode.SUBTRACT)
    with BuildSketch(Plane(origin=(22.580127019, -2, -8), x_dir=(0, -1, 0), z_dir=(-1, 0, 0))) as fillet13_piece_10a_section:
        with BuildLine():
            CenterArc((1.732050808, 2), FILLET13_R, 210, 60)
            Line((0, 1), (-0.034641016, 0.98))
            ThreePointArc((-0.034641016, 0.98), (-0.04, 0.5), (-0.04, 0))
            Line((-0.04, 0), (0, -0.04))
            Line((0, -0.04), (1.732050808, -0.04))
            Line((1.732050808, -0.04), (1.732050808, 0))
        make_face()
    fillet13_piece_10a = extrude(amount=11.830127019, mode=Mode.PRIVATE)
    fillet13_piece_10a = split(fillet13_piece_10a, bisect_by=Plane(origin=(18.25, -2.432620892, -7.740966578), z_dir=(1, 0, 0)), keep=Keep.TOP, mode=Mode.PRIVATE)
    with BuildSketch(Plane(origin=(18.25, 2, -8), x_dir=(1, 0, 0), z_dir=(0, -1, 0))) as fillet13_piece_10b_section:
        with BuildLine():
            CenterArc((1.732050808, 2), FILLET13_R, 210, 60)
            Line((0, 1), (-0.034641016, 0.98))
            ThreePointArc((-0.034641016, 0.98), (-0.04, 0.5), (-0.04, 0))
            Line((-0.04, 0), (0, -0.04))
            Line((0, -0.04), (1.732050808, -0.04))
            Line((1.732050808, -0.04), (1.732050808, 0))
        make_face()
    fillet13_piece_10b = extrude(amount=8.330127019, mode=Mode.PRIVATE)
    fillet13_piece_10b = split(fillet13_piece_10b, bisect_by=Plane(origin=(18.682620892, -2, -7.740966578), z_dir=(0, -1, 0)), keep=Keep.TOP, mode=Mode.PRIVATE)
    fillet13_piece_10 = fillet13_piece_10a & fillet13_piece_10b
    add(fillet13_piece_10, mode=Mode.SUBTRACT)

    # Sketch25 → Boss-Extrude12 (add)
    with BuildSketch(Plane.XY.offset(-5)):
        with Locations((-10.5, 12.5)):
            Circle(SKETCH25_R)
        with Locations((10.5, 12.5)):
            Circle(SKETCH25_R)
        with Locations((-10.5, -12.5)):
            Circle(SKETCH25_R)
        with Locations((10.337570801, -12.5)):
            Circle(SKETCH25_R)
    extrude(amount=BOSS_EXTRUDE12_DEPTH)

    # Sketch26 → Cut-Extrude18 (cut)
    with BuildSketch(Plane.XY.offset(-1)):
        with Locations((-10.5, 12.5)):
            Circle(SKETCH26_R)
        with Locations((10.5, 12.5)):
            Circle(SKETCH26_R)
        with Locations((-10.5, -12.5)):
            Circle(SKETCH26_R)
        with Locations((10.337570801, -12.5)):
            Circle(SKETCH26_R)
    extrude(amount=-CUT_EXTRUDE18_DEPTH, mode=Mode.SUBTRACT)

    # Sketch29 → Cut-Extrude20 (cut)
    with BuildSketch(Plane.XY.offset(4)):
        with Locations((-20, 0.559960549)):
            Rectangle(SKETCH29_W, SKETCH29_H)
    extrude(amount=-CUT_EXTRUDE20_DEPTH, mode=Mode.SUBTRACT)

    # Sketch30 → Cut-Extrude21 (cut)
    with BuildSketch(Plane.XZ.offset(-17)):
        with Locations((0, -0.436114316)):
            Rectangle(SKETCH30_W, SKETCH30_H)
    extrude(amount=-CUT_EXTRUDE21_DEPTH, mode=Mode.SUBTRACT)

    # Chamfer1
    chamfer1_edges = [part.edges().sort_by_distance(p)[0] for p in [
        (-13, 17, -0.436114316),
        (13, 17, -0.436114316),
    ]]
    chamfer(chamfer1_edges, length=CHAMFER1_SIZE)


with BuildPart() as body_2:
    # Sketch11 → Boss-Extrude9 (new body)
    with BuildSketch(Plane.XY.offset(4)):
        with Locations((20.976991949, 2)):
            Rectangle(SKETCH11_W, SKETCH11_H)
    extrude(amount=BOSS_EXTRUDE9_DEPTH)

    # Sketch12 → Cut-Extrude8 (cut)
    with BuildSketch(Plane.XY.offset(7.8)):
        with Locations((20.25, 2)):
            Rectangle(SKETCH12_W, SKETCH12_H)
    extrude(amount=-CUT_EXTRUDE8_DEPTH, mode=Mode.SUBTRACT)


solid = Compound([part.part, body_2.part])
